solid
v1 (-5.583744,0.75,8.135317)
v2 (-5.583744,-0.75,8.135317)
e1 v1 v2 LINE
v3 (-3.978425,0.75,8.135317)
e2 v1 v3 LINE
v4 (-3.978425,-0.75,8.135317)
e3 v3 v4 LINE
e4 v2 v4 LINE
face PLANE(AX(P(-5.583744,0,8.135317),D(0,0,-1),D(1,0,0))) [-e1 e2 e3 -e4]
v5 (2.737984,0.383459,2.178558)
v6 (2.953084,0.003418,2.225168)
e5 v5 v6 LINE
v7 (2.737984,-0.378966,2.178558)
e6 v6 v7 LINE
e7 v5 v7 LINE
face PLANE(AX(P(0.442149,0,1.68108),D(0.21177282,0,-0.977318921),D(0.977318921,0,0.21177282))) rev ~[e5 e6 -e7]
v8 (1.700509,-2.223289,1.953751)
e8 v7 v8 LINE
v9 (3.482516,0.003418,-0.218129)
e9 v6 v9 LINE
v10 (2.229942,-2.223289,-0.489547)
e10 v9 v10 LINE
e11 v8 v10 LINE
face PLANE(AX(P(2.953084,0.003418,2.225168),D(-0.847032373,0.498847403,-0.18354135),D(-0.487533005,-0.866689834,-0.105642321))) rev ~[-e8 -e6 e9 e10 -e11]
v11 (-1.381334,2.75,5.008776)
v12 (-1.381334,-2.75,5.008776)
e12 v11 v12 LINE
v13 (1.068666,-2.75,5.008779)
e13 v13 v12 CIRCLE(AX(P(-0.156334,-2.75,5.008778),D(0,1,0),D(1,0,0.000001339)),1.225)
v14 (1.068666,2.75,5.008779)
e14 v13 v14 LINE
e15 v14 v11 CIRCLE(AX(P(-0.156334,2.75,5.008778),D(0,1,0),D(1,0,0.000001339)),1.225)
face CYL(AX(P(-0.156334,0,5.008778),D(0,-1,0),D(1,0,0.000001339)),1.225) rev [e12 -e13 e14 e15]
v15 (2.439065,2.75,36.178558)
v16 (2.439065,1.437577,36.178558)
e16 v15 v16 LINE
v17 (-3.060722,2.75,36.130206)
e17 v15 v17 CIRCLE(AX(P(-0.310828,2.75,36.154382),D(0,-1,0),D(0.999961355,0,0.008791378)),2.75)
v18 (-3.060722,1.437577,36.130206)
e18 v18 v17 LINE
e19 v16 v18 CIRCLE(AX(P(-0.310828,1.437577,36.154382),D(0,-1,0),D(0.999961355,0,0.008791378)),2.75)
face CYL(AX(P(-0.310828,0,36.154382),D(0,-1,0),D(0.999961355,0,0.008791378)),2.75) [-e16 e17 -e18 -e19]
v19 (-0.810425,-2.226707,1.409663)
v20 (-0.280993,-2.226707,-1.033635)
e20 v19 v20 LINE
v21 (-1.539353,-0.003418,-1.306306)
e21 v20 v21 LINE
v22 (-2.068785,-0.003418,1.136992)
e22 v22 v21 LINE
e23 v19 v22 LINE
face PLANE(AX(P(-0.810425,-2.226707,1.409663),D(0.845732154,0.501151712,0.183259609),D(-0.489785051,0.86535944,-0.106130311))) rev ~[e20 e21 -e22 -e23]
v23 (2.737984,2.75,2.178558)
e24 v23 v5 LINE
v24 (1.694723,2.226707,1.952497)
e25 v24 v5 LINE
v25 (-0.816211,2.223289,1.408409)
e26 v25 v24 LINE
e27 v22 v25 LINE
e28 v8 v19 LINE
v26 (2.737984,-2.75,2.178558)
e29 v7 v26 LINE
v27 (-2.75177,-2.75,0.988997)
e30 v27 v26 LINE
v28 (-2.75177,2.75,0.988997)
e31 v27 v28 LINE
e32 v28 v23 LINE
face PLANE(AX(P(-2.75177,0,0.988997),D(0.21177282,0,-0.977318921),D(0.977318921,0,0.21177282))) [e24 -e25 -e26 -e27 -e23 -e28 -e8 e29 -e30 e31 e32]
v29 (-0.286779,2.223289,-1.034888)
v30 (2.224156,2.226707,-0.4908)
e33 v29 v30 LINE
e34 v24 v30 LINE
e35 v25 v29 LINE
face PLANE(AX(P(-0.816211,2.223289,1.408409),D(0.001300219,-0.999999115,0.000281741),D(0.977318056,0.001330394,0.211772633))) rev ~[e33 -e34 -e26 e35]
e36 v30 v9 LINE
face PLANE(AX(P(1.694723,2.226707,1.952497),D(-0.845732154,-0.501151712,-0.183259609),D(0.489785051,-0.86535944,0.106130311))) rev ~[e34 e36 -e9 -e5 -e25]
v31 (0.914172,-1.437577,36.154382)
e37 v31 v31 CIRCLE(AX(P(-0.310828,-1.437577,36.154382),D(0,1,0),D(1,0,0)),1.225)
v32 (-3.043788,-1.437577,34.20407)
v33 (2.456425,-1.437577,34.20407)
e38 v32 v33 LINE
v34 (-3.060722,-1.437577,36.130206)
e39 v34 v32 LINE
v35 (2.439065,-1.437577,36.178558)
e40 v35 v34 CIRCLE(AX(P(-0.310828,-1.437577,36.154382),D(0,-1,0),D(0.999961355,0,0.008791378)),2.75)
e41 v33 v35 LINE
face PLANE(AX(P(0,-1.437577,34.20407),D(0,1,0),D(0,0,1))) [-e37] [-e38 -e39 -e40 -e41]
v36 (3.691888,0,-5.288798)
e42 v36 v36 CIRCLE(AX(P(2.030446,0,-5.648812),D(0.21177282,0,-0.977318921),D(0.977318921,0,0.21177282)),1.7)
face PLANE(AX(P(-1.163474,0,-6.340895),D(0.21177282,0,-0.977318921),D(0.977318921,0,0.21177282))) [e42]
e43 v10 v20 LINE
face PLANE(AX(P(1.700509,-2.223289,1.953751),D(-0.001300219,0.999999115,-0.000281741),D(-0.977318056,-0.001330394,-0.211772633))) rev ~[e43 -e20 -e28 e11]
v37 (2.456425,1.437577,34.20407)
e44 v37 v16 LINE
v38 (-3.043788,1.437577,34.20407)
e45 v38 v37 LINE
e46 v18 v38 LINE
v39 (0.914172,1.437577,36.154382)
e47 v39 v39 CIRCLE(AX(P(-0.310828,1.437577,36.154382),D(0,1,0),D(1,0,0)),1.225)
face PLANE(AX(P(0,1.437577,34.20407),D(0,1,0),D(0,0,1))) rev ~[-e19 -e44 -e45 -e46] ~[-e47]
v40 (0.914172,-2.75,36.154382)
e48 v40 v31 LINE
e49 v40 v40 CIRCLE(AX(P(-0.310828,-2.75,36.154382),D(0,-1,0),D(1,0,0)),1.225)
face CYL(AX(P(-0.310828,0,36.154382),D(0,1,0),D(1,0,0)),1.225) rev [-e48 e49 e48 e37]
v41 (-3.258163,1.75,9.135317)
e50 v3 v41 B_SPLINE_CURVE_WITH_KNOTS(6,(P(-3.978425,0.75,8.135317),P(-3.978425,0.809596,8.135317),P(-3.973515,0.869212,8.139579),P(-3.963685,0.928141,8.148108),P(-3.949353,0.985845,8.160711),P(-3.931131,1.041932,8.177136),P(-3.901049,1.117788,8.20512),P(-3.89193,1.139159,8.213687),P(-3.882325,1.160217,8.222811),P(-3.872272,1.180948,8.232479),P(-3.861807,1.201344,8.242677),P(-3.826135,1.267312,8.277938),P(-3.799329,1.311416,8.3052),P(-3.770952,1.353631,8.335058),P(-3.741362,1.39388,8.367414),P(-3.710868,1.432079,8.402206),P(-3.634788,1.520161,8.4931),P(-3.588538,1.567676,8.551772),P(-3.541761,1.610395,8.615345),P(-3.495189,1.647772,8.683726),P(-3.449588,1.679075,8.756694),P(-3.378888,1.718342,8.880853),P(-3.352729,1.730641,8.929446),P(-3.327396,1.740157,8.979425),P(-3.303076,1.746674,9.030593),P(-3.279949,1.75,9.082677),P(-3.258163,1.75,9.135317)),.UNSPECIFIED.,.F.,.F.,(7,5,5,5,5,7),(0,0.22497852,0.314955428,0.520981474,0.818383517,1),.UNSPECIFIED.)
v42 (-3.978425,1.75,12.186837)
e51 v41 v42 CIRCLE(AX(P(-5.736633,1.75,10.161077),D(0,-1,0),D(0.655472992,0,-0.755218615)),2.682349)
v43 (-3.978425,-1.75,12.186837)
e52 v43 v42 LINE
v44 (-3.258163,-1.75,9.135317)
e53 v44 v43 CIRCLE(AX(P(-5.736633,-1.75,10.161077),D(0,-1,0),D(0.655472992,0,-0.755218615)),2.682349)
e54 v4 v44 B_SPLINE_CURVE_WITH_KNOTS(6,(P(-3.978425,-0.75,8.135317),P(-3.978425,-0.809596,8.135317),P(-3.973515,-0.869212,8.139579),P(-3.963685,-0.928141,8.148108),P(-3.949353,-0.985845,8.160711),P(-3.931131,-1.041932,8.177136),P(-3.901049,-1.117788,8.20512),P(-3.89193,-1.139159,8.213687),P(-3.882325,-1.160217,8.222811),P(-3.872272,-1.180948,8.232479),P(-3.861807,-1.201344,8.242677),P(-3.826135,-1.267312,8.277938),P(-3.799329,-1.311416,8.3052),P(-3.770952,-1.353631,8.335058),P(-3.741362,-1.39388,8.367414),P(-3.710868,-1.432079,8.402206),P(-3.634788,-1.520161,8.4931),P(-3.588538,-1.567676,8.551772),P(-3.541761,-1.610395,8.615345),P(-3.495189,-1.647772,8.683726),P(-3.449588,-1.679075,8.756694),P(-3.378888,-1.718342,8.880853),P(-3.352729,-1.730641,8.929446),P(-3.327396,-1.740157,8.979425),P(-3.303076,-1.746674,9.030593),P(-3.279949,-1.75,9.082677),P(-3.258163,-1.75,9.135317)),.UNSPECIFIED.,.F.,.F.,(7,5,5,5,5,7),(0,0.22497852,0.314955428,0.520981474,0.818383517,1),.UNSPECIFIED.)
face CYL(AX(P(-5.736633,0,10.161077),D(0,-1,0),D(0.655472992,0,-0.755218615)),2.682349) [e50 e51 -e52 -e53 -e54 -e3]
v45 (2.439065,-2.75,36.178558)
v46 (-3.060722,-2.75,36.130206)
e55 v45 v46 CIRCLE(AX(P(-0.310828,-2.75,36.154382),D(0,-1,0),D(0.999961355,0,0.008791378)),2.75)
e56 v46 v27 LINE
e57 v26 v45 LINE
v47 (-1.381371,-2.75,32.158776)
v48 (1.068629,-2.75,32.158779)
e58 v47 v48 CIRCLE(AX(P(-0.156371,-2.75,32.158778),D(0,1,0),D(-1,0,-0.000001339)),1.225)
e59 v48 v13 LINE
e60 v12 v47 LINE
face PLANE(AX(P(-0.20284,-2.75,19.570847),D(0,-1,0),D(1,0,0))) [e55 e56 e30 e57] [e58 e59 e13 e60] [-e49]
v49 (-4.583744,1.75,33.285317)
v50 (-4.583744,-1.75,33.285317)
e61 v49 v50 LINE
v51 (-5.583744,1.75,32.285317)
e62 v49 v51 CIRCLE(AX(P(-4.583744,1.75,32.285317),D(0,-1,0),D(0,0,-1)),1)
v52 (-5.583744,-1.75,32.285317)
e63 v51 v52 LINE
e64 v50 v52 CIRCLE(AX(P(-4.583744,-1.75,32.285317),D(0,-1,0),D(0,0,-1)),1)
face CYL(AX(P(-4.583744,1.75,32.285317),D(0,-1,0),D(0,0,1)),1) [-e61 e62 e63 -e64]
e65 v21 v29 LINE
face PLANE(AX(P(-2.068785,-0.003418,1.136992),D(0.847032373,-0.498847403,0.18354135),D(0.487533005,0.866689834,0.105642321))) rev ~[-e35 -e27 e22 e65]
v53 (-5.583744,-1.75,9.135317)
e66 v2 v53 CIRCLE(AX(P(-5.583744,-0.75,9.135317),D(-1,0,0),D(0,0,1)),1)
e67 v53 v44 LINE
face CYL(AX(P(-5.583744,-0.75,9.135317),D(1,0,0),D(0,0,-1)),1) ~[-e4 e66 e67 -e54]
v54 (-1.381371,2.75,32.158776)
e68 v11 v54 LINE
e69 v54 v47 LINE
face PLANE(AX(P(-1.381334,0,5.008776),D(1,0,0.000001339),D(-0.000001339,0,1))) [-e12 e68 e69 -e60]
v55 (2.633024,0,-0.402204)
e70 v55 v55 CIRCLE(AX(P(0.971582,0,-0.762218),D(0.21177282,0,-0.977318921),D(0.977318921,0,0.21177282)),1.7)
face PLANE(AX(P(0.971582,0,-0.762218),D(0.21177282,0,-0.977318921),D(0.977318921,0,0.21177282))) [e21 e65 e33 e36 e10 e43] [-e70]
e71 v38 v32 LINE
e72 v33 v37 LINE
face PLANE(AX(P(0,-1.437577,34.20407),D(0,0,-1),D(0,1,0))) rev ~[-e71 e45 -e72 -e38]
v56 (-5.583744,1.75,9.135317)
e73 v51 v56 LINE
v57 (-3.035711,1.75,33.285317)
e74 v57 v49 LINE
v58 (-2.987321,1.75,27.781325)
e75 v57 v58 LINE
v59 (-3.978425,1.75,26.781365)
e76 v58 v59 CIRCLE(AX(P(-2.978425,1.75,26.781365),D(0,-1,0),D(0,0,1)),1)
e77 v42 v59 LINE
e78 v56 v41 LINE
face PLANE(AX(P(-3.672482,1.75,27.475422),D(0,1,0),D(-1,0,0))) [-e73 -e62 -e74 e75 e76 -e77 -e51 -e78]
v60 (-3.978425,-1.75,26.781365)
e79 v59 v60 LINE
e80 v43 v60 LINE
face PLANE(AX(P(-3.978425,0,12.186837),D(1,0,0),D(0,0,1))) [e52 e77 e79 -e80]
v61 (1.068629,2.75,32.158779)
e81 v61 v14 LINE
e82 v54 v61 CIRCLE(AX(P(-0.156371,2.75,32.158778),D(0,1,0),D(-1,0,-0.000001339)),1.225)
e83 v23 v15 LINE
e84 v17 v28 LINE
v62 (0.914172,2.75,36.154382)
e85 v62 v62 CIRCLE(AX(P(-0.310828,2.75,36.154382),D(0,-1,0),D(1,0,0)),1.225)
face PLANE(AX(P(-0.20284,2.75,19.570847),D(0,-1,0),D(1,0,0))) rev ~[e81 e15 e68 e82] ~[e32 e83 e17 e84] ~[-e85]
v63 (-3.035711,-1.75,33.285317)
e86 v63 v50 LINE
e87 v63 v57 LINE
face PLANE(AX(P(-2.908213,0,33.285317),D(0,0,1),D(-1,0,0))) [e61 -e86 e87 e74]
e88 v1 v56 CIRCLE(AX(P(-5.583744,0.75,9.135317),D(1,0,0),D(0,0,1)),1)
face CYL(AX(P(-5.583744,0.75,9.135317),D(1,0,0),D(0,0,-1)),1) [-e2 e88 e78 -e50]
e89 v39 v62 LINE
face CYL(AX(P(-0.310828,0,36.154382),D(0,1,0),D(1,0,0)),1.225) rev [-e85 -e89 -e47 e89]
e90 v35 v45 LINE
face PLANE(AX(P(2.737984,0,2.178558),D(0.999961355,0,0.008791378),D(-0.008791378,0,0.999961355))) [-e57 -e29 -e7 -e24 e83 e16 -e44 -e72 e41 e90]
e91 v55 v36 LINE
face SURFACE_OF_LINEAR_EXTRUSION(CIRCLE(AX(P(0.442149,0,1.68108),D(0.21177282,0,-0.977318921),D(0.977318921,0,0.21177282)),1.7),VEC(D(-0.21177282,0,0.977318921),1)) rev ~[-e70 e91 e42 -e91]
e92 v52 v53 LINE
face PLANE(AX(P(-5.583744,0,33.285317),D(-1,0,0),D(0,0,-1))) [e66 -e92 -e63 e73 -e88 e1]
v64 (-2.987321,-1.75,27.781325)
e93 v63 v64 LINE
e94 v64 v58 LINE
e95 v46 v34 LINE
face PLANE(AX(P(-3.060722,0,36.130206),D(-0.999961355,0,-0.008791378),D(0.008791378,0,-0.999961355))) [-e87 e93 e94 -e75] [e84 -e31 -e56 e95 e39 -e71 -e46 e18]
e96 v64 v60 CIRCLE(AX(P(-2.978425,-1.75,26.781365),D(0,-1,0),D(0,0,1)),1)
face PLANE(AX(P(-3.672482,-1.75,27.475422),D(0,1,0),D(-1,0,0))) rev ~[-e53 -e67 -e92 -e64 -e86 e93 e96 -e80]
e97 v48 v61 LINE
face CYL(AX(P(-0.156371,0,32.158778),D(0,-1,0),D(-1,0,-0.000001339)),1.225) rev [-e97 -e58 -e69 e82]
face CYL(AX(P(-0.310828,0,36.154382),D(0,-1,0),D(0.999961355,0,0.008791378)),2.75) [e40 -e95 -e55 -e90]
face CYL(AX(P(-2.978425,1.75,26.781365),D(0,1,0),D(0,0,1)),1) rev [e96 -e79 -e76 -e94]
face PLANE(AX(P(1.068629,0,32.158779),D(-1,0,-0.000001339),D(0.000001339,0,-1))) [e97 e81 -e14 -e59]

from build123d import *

# Parameters (mm, degrees)
F0_R        = 1.225
F1_DEPTH    = 2.75
F3_DEPTH    = 1.75
F4_W        = 2.8751536738
F4_H        = 5.9757605195
F5_DEPTH    = 13
F6_T1_DEPTH = 3.5
F7_R        = 1
F9_R        = 1.7
F10_DEPTH   = 2.5
F11_DEPTH   = 7.5


# Not quite as in the source:
# - a fillet or chamfer that OpenCascade refuses, or shapes differently, is made with other operations: its cross-section is extruded or revolved along the edge and cut away or added


with BuildPart() as f1:
    # F0 (on Front) → F1 (new body, symmetric)
    with BuildSketch(Plane.XZ):
        with BuildLine():
            Line((-2.7517704794, 0.9889971563), (2.7379837894, 2.1785584332))
            Line((2.7379837894, 2.1785584332), (2.4390654013, 36.1785584332))
            ThreePointArc((2.4390654013, 36.1785584332), (-0.3350046134, 38.9042758715), (-3.0607220517, 36.1302058568))
            Line((-3.0607220517, 36.1302058568), (-2.7517704794, 0.9889971563))
        make_face()
        with BuildLine():
            Line((-1.3813343576, 5.0087761541), (-1.3813707205, 32.1587761541))
            ThreePointArc((-1.3813707205, 32.1587761541), (-0.1563723611, 33.3837777948), (1.0686292795, 32.1587794355))
            Line((1.0686292795, 32.1587794355), (1.0686656424, 5.0087794355))
            ThreePointArc((1.0686656424, 5.0087794355), (-0.1563327169, 3.7837777948), (-1.3813343576, 5.0087761541))
        make_face(mode=Mode.SUBTRACT)
        with Locations((-0.3108283252, 36.154382145)):
            Circle(F0_R, mode=Mode.SUBTRACT)
    extrude(amount=F1_DEPTH, both=True)

    # F2 (on Front) → F3 (join, symmetric)
    with BuildSketch(Plane.XZ):
        Polygon((-2.9082125786, 27.7813646846), (-2.9082125786, 33.2853169523), (-5.5837442831, 33.2853169523), (-5.5837442831, 8.1353169523), (-3.9784252097, 8.1353169523), (-3.9784252097, 12.1868369773), (-3.9784252097, 27.7813646846), align=None)
        with BuildLine():
            Line((-3.9784252097, 12.1868369773), (-3.9784252097, 8.1353169523))
            ThreePointArc((-3.9784252097, 8.1353169523), (-3.0542834819, 10.1610769648), (-3.9784252097, 12.1868369773))
        make_face()
    extrude(amount=F3_DEPTH, both=True)

    # F4 (on Right) → F5 (cut, symmetric)
    with BuildSketch(Plane.YZ):
        with Locations((0, 37.1919497848)):
            Rectangle(F4_W, F4_H)
    extrude(amount=F5_DEPTH, both=True, mode=Mode.SUBTRACT)

    # F6: fillet of radius 1 on 1 edges, made by hand

    # F6_s2 → F6_t1 (join)
    with BuildSketch(Plane.XZ.offset(-1.75)):
        with BuildLine():
            ThreePointArc((-2.9784252097, 27.7813646846), (-3.6855319909, 27.4884714657), (-3.9784252097, 26.7813646846))
            Line((-3.9784252097, 26.7813646846), (-3.9784252097, 27.7813646846))
            Line((-3.9784252097, 27.7813646846), (-2.9784252097, 27.7813646846))
        make_face()
    extrude(amount=F6_T1_DEPTH)

    # F7
    f7_edges = [f1.edges().sort_by_distance(p)[0] for p in [
        (-5.583744, 0, 33.285317),
        (-4.781085, 1.75, 8.135317),
        (-4.781085, -1.75, 8.135317),
    ]]
    fillet(f7_edges, radius=F7_R)

    # F9 (on offset) → F10 (join)
    with BuildSketch(Plane(origin=(-0.3281029821, 0, 1.5141756728), x_dir=(0.9773189207, 0, 0.2117728201), z_dir=(0.2117728201, 0, -0.9773189207))):
        Polygon((2.0697711183, -2.2267070605), (3.3573344565, -0.0034180592), (2.0756913705, 2.2232890013), (-0.4935150537, 2.2267070605), (-1.7810783919, 0.0034180592), (-0.4994353059, -2.2232890013), align=None)
        with Locations((0.7881280323, 0)):
            Circle(F9_R, mode=Mode.SUBTRACT)
    extrude(amount=F10_DEPTH)

    # F11 (add): a face of the model
    f11_faces = [f1.faces().sort_by_distance(p)[0] for p in [
        (0.4421494557, 0, 1.6810797688),
    ]]
    extrude(f11_faces, amount=F11_DEPTH)


solid = f1.part
